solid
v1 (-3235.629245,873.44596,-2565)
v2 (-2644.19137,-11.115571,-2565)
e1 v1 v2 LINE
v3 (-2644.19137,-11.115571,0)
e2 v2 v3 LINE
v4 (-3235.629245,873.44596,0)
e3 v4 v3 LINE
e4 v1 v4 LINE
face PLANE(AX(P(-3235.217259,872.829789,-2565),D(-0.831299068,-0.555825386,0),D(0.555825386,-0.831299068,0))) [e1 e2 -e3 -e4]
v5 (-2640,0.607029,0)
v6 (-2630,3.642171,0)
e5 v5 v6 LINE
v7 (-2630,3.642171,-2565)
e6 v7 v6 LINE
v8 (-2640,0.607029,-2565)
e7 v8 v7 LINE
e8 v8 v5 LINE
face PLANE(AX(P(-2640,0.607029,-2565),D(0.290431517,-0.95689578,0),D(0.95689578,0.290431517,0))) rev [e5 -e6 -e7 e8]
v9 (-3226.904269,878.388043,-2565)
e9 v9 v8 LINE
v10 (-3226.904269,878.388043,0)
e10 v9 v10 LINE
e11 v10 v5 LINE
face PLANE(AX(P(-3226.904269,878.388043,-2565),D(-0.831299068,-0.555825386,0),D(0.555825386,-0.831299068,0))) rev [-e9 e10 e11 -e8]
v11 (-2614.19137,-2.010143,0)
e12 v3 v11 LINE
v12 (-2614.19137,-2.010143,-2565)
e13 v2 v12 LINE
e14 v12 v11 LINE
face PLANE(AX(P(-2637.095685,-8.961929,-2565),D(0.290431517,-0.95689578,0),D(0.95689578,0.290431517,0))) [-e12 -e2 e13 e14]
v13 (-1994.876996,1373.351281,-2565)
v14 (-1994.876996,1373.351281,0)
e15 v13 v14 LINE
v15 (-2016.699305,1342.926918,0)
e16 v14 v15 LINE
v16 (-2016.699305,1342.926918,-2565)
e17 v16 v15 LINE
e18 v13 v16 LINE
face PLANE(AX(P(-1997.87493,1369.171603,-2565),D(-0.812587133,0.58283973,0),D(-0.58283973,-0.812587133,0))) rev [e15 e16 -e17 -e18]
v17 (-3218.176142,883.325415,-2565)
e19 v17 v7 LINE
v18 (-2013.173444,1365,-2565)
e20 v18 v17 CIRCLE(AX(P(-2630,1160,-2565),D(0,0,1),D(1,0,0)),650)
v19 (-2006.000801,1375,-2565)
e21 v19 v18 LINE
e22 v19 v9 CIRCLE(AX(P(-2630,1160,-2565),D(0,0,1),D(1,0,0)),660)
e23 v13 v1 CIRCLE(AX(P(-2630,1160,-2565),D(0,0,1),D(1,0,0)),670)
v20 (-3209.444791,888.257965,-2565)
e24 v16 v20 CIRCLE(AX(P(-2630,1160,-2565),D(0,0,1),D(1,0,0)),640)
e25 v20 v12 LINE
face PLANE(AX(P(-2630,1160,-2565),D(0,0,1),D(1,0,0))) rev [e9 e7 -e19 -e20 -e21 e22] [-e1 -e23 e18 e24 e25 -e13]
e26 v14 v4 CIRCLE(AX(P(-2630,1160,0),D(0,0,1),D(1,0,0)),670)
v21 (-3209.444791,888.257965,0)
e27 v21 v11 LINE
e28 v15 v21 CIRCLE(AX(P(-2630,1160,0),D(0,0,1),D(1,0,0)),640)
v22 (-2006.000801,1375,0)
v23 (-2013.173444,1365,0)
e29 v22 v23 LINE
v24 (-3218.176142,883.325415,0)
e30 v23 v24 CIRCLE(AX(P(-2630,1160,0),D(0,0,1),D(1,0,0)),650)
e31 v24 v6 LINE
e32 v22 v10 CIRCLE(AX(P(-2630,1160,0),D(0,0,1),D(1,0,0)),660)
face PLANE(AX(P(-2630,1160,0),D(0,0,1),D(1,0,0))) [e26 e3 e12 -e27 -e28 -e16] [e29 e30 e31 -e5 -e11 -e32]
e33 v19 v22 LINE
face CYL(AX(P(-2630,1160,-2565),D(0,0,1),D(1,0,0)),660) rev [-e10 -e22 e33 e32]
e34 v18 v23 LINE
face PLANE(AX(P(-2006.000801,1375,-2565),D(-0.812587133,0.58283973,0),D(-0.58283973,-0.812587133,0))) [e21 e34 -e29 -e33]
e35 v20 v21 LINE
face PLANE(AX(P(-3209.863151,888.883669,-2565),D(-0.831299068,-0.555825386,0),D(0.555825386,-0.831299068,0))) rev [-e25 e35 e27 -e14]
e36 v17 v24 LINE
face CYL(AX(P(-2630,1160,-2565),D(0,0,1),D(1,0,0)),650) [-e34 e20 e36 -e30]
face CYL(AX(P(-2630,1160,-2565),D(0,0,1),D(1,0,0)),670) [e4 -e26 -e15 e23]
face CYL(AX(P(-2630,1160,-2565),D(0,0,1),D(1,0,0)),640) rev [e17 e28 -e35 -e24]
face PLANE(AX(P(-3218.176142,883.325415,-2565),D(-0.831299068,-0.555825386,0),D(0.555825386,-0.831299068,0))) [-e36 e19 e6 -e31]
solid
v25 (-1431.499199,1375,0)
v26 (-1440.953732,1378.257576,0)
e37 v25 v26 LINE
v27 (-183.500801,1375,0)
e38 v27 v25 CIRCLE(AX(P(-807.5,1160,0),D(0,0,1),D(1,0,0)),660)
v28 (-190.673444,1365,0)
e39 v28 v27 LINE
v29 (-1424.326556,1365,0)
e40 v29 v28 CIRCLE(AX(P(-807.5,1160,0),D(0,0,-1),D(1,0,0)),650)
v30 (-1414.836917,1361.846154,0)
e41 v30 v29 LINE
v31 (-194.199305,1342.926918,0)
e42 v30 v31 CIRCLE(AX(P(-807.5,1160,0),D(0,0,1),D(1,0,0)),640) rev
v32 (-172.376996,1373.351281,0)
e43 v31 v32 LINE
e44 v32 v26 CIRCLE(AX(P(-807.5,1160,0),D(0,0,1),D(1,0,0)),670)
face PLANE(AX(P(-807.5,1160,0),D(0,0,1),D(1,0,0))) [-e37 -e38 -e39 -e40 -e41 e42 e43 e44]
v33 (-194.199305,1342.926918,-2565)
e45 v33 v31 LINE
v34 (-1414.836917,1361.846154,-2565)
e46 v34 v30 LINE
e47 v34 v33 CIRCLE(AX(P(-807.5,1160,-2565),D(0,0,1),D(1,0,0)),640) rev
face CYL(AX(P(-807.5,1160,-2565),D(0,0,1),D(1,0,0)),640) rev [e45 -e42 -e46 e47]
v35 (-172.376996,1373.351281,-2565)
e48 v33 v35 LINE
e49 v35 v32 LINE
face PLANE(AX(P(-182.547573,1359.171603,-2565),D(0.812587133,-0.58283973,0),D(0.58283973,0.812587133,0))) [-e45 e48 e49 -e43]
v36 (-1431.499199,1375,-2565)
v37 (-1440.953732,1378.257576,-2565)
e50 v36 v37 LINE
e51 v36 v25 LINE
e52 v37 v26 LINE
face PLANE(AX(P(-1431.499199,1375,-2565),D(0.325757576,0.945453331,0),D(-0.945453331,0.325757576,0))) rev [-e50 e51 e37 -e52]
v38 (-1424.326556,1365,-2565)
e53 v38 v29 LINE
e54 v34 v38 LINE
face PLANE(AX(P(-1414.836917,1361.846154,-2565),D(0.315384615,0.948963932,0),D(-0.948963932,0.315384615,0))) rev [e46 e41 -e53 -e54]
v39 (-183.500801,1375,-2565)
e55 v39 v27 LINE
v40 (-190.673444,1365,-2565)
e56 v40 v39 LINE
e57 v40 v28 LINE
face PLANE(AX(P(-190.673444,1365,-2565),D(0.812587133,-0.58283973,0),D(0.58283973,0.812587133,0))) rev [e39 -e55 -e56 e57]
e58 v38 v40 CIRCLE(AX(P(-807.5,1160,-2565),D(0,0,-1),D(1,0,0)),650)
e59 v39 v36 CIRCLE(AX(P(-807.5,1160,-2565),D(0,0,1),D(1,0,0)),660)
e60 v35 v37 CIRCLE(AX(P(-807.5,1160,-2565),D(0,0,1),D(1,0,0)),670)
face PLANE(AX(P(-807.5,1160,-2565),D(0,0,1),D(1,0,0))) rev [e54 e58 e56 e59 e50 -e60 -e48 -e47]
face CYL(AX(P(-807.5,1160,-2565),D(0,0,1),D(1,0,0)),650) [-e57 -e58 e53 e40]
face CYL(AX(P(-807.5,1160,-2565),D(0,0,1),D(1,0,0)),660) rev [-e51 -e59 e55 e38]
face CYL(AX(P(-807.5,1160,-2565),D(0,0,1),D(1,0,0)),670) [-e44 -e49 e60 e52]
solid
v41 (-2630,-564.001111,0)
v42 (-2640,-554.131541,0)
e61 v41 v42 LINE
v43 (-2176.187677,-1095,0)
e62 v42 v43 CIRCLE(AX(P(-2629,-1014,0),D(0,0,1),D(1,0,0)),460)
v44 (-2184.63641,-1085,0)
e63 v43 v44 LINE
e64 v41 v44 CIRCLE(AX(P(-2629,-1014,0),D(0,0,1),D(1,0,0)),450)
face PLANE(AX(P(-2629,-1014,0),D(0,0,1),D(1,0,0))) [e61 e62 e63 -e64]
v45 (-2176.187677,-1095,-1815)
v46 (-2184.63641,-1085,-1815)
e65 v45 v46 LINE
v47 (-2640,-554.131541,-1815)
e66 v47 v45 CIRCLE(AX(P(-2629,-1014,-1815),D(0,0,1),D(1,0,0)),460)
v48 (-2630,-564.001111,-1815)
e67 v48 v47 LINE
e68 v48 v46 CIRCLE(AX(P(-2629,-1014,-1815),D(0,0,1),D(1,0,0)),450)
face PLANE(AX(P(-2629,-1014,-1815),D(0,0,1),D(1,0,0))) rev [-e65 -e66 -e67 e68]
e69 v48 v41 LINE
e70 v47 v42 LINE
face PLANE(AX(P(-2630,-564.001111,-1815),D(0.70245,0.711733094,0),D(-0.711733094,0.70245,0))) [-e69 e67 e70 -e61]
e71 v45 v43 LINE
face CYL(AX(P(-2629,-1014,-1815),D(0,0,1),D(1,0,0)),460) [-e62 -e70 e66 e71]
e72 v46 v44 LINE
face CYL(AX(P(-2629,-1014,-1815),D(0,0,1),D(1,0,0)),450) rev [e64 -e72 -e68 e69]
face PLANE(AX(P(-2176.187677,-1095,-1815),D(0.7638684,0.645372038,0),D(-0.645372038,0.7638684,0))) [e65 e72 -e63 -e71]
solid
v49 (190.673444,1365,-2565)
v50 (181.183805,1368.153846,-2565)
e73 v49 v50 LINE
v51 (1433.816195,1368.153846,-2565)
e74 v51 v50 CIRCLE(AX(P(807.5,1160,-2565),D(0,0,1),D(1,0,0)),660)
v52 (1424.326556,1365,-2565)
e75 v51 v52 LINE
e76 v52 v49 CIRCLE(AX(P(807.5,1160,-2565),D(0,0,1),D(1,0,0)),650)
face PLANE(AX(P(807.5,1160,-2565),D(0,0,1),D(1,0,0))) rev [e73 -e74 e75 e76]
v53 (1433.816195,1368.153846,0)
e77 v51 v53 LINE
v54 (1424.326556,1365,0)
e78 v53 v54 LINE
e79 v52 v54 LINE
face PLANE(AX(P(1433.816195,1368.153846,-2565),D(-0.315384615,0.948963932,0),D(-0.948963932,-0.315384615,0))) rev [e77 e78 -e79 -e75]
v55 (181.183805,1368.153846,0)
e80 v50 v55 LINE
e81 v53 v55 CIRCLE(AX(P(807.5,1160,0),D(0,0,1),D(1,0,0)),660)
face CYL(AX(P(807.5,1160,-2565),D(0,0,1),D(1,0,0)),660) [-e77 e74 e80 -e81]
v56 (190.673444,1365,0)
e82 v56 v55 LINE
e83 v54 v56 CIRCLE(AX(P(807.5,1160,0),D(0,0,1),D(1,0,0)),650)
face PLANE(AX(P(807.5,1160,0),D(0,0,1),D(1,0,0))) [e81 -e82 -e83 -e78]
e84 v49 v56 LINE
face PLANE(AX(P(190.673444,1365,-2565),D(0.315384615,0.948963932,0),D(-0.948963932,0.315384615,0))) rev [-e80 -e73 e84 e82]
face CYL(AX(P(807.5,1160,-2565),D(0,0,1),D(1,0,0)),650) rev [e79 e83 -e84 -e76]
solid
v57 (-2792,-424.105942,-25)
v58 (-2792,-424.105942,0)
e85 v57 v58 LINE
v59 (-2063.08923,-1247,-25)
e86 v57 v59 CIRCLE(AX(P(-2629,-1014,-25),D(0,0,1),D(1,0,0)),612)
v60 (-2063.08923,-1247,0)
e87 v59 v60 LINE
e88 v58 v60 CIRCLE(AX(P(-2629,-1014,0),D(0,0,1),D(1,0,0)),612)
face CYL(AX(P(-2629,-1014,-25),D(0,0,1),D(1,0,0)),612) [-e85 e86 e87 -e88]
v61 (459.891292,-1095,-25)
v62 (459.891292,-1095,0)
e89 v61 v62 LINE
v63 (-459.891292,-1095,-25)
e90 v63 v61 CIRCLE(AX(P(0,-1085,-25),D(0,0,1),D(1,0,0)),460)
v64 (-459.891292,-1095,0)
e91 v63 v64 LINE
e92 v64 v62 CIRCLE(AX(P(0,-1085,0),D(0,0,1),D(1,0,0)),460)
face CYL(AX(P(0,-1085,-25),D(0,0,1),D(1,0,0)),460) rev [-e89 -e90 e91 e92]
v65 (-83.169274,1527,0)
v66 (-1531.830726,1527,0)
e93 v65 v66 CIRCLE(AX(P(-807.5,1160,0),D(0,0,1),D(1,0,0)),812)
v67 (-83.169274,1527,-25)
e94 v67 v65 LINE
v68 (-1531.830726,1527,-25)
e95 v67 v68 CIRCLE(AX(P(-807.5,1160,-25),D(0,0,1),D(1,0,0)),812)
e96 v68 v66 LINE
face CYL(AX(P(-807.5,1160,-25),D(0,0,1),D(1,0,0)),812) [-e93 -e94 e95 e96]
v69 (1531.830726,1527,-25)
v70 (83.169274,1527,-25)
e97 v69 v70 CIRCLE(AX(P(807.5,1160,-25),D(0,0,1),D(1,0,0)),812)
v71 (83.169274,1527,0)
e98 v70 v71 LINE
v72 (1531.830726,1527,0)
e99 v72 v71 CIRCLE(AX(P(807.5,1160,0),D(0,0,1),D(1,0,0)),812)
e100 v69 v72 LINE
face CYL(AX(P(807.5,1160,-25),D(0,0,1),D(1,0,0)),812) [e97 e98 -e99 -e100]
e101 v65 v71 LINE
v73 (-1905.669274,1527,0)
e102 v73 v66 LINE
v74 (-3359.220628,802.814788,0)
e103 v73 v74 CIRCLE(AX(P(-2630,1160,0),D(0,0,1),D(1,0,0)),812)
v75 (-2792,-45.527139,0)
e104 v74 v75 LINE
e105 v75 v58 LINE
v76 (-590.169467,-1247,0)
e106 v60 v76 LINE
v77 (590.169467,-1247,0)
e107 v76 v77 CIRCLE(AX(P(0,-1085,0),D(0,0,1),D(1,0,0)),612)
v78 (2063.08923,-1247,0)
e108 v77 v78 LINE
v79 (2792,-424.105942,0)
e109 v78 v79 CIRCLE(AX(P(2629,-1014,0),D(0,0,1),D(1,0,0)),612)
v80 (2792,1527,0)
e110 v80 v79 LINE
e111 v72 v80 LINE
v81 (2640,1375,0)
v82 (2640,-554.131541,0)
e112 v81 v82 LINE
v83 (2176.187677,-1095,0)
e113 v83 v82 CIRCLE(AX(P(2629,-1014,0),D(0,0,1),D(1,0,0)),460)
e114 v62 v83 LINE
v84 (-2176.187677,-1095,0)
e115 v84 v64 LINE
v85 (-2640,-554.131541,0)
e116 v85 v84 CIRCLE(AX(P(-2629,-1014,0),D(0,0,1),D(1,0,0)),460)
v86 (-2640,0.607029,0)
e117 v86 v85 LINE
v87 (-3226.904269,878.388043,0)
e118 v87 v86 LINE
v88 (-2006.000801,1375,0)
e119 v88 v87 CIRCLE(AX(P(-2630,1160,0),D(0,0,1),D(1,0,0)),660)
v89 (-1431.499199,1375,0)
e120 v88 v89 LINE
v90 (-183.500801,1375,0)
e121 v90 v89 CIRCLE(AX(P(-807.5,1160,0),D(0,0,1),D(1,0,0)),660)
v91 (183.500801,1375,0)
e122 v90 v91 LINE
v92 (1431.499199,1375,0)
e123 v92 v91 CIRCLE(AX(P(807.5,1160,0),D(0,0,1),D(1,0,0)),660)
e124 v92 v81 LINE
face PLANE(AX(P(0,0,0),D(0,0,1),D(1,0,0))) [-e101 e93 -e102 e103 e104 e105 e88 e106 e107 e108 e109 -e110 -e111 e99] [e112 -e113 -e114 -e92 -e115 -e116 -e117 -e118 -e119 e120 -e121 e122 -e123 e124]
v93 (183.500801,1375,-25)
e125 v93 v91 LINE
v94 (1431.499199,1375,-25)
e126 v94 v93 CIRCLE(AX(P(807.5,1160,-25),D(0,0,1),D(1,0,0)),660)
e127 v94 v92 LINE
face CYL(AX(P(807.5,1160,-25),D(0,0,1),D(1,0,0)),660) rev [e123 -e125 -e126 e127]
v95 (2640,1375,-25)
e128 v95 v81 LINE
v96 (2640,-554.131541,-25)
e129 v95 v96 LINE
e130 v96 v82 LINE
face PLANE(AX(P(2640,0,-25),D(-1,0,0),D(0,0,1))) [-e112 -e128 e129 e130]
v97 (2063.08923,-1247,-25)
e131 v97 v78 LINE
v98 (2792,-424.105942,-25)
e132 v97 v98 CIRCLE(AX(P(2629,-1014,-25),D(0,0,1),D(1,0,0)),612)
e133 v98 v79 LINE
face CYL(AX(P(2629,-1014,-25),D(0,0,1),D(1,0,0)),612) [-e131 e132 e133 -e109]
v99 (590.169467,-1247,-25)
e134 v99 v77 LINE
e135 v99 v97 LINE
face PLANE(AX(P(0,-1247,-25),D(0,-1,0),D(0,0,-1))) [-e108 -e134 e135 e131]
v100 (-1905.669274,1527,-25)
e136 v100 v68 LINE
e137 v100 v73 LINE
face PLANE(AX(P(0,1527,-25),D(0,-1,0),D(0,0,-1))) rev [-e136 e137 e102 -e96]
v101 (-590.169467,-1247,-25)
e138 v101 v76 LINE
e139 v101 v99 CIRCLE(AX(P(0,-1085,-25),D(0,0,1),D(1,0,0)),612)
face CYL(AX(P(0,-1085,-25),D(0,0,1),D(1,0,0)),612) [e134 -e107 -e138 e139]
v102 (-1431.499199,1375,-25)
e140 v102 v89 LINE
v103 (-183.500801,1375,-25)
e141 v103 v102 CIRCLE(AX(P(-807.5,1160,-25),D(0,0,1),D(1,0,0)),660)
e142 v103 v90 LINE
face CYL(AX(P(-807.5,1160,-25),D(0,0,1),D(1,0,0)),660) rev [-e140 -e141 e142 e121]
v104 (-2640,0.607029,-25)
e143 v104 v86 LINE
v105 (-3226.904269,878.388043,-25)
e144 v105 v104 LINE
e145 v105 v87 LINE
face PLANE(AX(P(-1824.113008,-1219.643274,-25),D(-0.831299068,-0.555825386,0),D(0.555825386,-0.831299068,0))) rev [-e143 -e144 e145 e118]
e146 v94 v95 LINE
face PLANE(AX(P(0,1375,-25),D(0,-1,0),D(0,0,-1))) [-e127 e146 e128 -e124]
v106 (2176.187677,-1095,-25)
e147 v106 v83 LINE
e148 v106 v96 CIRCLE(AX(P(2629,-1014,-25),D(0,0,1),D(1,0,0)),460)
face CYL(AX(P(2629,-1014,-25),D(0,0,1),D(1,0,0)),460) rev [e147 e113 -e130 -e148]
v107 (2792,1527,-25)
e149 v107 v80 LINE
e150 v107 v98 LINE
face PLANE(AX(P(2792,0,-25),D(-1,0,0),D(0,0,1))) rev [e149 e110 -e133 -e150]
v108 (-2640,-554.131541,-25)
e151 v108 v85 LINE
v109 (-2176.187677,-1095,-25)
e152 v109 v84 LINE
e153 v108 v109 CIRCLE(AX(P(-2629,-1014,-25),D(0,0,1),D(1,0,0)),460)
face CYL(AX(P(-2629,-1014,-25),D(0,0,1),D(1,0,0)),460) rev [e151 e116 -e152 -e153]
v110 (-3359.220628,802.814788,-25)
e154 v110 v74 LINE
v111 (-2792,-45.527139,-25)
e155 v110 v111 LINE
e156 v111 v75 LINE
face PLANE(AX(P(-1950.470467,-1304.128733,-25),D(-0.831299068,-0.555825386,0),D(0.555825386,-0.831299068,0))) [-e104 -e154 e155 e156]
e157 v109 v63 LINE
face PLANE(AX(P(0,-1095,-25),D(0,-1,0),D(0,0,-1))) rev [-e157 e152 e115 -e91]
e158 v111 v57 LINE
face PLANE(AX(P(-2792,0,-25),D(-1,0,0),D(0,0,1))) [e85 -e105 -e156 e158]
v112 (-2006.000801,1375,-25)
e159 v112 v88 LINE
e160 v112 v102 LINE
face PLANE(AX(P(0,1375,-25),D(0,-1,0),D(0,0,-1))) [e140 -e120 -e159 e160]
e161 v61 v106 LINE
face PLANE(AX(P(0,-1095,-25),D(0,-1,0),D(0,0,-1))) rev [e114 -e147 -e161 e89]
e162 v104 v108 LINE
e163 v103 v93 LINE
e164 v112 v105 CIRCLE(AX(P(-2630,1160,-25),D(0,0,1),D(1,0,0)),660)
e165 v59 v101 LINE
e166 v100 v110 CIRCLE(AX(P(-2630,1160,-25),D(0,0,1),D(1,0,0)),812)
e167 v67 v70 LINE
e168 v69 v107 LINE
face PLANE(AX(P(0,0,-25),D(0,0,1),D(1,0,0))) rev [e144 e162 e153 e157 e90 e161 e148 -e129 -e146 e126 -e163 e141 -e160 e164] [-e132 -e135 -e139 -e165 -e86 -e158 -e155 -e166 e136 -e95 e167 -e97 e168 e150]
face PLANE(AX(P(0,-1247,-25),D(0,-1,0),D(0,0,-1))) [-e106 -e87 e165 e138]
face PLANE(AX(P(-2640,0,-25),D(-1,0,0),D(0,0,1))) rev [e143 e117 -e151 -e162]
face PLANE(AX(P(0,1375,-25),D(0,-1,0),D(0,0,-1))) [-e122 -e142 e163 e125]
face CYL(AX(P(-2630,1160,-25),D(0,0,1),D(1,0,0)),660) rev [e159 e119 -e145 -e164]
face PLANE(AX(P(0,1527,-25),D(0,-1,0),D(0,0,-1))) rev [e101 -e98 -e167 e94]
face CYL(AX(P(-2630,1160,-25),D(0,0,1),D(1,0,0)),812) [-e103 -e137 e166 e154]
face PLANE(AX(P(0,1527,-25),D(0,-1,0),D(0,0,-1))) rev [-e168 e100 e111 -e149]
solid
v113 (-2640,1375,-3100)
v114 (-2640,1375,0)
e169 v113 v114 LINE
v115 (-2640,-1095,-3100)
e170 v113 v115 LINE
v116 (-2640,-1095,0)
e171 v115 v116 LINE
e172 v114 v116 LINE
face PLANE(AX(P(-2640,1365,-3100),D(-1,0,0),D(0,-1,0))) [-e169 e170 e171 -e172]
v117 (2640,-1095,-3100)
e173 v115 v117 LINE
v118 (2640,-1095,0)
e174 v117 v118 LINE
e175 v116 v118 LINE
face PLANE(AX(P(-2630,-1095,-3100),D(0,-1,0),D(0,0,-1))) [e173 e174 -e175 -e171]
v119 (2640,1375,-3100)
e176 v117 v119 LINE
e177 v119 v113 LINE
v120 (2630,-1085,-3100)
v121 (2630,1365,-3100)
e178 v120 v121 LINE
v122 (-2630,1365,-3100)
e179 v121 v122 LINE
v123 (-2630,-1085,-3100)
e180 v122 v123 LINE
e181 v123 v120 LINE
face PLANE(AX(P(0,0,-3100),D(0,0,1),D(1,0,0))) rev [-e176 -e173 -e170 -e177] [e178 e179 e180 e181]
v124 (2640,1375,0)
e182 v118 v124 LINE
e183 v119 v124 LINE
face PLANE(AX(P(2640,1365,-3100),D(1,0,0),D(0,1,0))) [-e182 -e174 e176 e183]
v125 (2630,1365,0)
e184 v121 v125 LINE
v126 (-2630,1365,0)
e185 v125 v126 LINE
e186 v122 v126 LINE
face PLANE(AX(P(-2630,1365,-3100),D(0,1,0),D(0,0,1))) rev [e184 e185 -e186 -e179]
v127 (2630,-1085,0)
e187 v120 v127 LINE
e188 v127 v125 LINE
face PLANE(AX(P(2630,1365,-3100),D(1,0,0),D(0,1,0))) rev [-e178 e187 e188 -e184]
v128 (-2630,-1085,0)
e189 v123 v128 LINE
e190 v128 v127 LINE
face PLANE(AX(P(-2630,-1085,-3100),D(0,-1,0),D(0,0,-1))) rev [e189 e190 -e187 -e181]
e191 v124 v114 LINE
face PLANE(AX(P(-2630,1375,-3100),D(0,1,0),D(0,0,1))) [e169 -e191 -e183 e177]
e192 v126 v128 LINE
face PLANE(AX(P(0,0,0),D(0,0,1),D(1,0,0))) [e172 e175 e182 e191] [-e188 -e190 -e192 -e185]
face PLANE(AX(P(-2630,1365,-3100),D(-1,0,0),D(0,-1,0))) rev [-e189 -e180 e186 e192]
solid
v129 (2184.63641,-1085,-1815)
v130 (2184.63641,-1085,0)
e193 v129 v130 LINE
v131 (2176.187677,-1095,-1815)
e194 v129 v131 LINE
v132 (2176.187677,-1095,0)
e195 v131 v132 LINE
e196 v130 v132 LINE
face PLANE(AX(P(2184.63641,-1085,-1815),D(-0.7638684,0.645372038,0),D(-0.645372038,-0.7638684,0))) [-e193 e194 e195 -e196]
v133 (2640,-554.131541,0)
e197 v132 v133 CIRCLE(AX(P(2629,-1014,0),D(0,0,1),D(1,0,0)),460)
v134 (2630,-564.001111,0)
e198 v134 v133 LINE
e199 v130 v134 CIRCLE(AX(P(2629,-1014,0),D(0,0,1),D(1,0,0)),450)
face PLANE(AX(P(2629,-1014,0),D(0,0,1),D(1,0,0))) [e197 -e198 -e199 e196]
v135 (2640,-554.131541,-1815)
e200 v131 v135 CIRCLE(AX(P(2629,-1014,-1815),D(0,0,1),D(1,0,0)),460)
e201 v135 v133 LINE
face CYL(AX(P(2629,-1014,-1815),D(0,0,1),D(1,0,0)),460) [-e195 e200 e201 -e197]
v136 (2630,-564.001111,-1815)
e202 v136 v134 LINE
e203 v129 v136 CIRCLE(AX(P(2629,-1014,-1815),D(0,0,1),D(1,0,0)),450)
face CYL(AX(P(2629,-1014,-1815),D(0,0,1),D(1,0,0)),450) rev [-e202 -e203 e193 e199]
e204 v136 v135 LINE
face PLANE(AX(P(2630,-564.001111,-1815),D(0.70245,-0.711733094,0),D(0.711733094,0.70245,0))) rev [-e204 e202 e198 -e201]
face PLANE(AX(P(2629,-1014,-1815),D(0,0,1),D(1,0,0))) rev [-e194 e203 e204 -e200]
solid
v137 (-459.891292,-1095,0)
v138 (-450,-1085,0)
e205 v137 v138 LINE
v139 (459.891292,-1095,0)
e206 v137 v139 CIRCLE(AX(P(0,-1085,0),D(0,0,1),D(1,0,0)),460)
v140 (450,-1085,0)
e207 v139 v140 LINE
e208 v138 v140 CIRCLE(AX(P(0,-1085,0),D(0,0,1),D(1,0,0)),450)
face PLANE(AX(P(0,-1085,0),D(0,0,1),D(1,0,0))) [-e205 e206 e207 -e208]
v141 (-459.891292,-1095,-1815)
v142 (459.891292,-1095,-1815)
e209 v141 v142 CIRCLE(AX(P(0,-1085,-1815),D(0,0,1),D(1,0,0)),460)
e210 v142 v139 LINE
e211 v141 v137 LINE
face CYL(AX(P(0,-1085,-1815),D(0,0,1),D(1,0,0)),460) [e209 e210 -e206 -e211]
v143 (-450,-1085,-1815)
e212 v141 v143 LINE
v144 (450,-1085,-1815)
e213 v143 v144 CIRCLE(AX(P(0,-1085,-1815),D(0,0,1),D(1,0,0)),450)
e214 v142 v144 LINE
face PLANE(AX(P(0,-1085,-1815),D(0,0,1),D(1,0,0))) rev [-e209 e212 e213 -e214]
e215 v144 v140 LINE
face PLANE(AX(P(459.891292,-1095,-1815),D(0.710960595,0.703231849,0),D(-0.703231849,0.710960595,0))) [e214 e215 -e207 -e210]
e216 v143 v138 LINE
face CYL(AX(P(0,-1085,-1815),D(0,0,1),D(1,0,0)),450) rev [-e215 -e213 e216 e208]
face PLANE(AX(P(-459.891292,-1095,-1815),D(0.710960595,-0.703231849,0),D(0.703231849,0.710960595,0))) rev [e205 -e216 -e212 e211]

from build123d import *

# Parameters (mm, degrees)
BOSS_EXTRUDE2_DEPTH         = 25
SKETCH13_W                  = 5280
SKETCH13_H                  = 2470
SKETCH13_W_2                = 5260
SKETCH13_H_2                = 2450
EXTRUDE_THIN3_DEPTH         = 3100
OLTC_ROUND_EXTRUDE5_DEPTH   = 1815
OLTC_ROUND_EXTRUDE5_2_DEPTH = 1815
OLTC_ROUND_EXTRUDE5_3_DEPTH = 1815
EXTRUDE_THIN6_DEPTH         = 2565
EXTRUDE_THIN6_2_DEPTH       = 2565
EXTRUDE_THIN6_3_DEPTH       = 2565


with BuildPart() as part:
    # curb → Boss-Extrude2 (new body)
    with BuildSketch(Plane.XY):
        with BuildLine():
            ThreePointArc((-1905.669274433, 1527), (-2992.100860231, 1886.792244744), (-3359.22062819, 802.81478835))
            Line((-3359.22062819, 802.81478835), (-2792, -45.527139379))
            Line((-2792, -45.527139379), (-2792, -424.105941715))
            ThreePointArc((-2792, -424.105941715), (-3087.118903787, -1419.796833395), (-2063.089229648, -1247))
            Line((-2063.089229648, -1247), (-590.169467187, -1247))
            ThreePointArc((-590.169467187, -1247), (0, -1697), (590.169467187, -1247))
            Line((590.169467187, -1247), (2063.089229648, -1247))
            ThreePointArc((2063.089229648, -1247), (3087.118903787, -1419.796833395), (2792, -424.105941715))
            Line((2792, -424.105941715), (2792, 1527))
            Line((2792, 1527), (1531.830725567, 1527))
            ThreePointArc((1531.830725567, 1527), (807.5, 1972), (83.169274433, 1527))
            Line((83.169274433, 1527), (-83.169274433, 1527))
            ThreePointArc((-83.169274433, 1527), (-807.5, 1972), (-1531.830725567, 1527))
            Line((-1531.830725567, 1527), (-1905.669274433, 1527))
        make_face()
        with BuildLine():
            Line((-2640, -554.131540547), (-2640, 0.607028525))
            Line((-2640, 0.607028525), (-3226.904268523, 878.38804319))
            ThreePointArc((-3226.904268523, 878.38804319), (-2878.675275655, 1771.359638247), (-2006.000801283, 1375))
            Line((-2006.000801283, 1375), (-1431.499198717, 1375))
            ThreePointArc((-1431.499198717, 1375), (-807.5, 1820), (-183.500801283, 1375))
            Line((-183.500801283, 1375), (183.500801283, 1375))
            ThreePointArc((183.500801283, 1375), (807.5, 1820), (1431.499198717, 1375))
            Line((1431.499198717, 1375), (2640, 1375))
            Line((2640, 1375), (2640, -554.131540547))
            ThreePointArc((2640, -554.131540547), (2978.190785718, -1313.44247389), (2176.187676846, -1095))
            Line((2176.187676846, -1095), (459.891291503, -1095))
            ThreePointArc((459.891291503, -1095), (0, -1545), (-459.891291503, -1095))
            Line((-459.891291503, -1095), (-2176.187676846, -1095))
            ThreePointArc((-2176.187676846, -1095), (-2978.190785718, -1313.44247389), (-2640, -554.131540547))
        make_face(mode=Mode.SUBTRACT)
    extrude(amount=-BOSS_EXTRUDE2_DEPTH)


with BuildPart() as body_2:
    # Sketch13 → Extrude-Thin3 (new body)
    with BuildSketch(Plane.XY):
        with Locations((0, 140)):
            Rectangle(SKETCH13_W, SKETCH13_H)
        with Locations((0, 140)):
            Rectangle(SKETCH13_W_2, SKETCH13_H_2, mode=Mode.SUBTRACT)
    extrude(amount=-EXTRUDE_THIN3_DEPTH)


with BuildPart() as body_3:
    # hv round → oltc round-Extrude5 (new body)
    with BuildSketch(Plane.XY):
        with BuildLine():
            Line((2184.636410132, -1085), (2176.187676846, -1095))
            ThreePointArc((2176.187676846, -1095), (2978.190785718, -1313.44247389), (2640, -554.131540547))
            Line((2640, -554.131540547), (2630, -564.001111112))
            ThreePointArc((2630, -564.001111112), (2971.056689396, -1306.399078725), (2184.636410132, -1085))
        make_face()
    extrude(amount=-OLTC_ROUND_EXTRUDE5_DEPTH)


with BuildPart() as body_4:
    # hv round → oltc round-Extrude5 2 (new body)
    with BuildSketch(Plane.XY):
        with BuildLine():
            Line((459.891291503, -1095), (450, -1085))
            ThreePointArc((450, -1085), (0, -1535), (-450, -1085))
            Line((-450, -1085), (-459.891291503, -1095))
            ThreePointArc((-459.891291503, -1095), (0, -1545), (459.891291503, -1095))
        make_face()
    extrude(amount=-OLTC_ROUND_EXTRUDE5_2_DEPTH)


with BuildPart() as body_5:
    # hv round → oltc round-Extrude5 3 (new body)
    with BuildSketch(Plane.XY):
        with BuildLine():
            Line((-2176.187676846, -1095), (-2184.636410132, -1085))
            ThreePointArc((-2184.636410132, -1085), (-2971.056689396, -1306.399078725), (-2630, -564.001111112))
            Line((-2630, -564.001111112), (-2640, -554.131540547))
            ThreePointArc((-2640, -554.131540547), (-2978.190785718, -1313.44247389), (-2176.187676846, -1095))
        make_face()
    extrude(amount=-OLTC_ROUND_EXTRUDE5_3_DEPTH)


with BuildPart() as body_6:
    # oltc round → Extrude-Thin6 (new body)
    with BuildSketch(Plane.XY):
        with BuildLine():
            Line((-1994.876995624, 1373.351281489), (-2016.699304896, 1342.926918153))
            ThreePointArc((-2016.699304896, 1342.926918153), (-2857.963856524, 1758.023812334), (-3209.444791338, 888.257964622))
            Line((-3209.444791338, 888.257964622), (-2614.19136966, -2.010142948))
            Line((-2614.19136966, -2.010142948), (-2644.19136966, -11.115570824))
            Line((-2644.19136966, -11.115570824), (-3235.62924464, 873.445959658))
            ThreePointArc((-3235.62924464, 873.445959658), (-2880.387306316, 1781.4549033), (-1994.876995624, 1373.351281489))
        make_face()
        with BuildLine():
            Line((-2006.000801283, 1375), (-2013.173444151, 1365))
            ThreePointArc((-2013.173444151, 1365), (-2871.262954199, 1763.566224147), (-3218.17614189, 883.325414771))
            Line((-3218.17614189, 883.325414771), (-2630, 3.64217115))
            Line((-2630, 3.64217115), (-2640, 0.607028525))
            Line((-2640, 0.607028525), (-3226.904268523, 878.38804319))
            ThreePointArc((-3226.904268523, 878.38804319), (-2878.675275655, 1771.359638247), (-2006.000801283, 1375))
        make_face(mode=Mode.SUBTRACT)
    extrude(amount=-EXTRUDE_THIN6_DEPTH)


with BuildPart() as body_7:
    # oltc round → Extrude-Thin6 2 (new body)
    with BuildSketch(Plane.XY):
        with BuildLine():
            ThreePointArc((-1424.326555849, 1365), (-807.5, 1810), (-190.673444151, 1365))
            Line((-190.673444151, 1365), (-183.500801283, 1375))
            ThreePointArc((-183.500801283, 1375), (-807.5, 1820), (-1431.499198717, 1375))
            Line((-1431.499198717, 1375), (-1440.953732031, 1378.257575758))
            ThreePointArc((-1440.953732031, 1378.257575758), (-804.908755433, 1829.994989124), (-172.376995624, 1373.351281489))
            Line((-172.376995624, 1373.351281489), (-194.199304896, 1342.926918153))
            ThreePointArc((-194.199304896, 1342.926918153), (-797.581530686, 1799.923139108), (-1414.836916528, 1361.846153846))
            Line((-1414.836916528, 1361.846153846), (-1424.326555849, 1365))
        make_face()
    extrude(amount=-EXTRUDE_THIN6_2_DEPTH)


with BuildPart() as body_8:
    # oltc round → Extrude-Thin6 3 (new body)
    with BuildSketch(Plane.XY):
        with BuildLine():
            ThreePointArc((1424.326555849, 1365), (807.5, 1810), (190.673444151, 1365))
            Line((190.673444151, 1365), (181.183804831, 1368.153846154))
            ThreePointArc((181.183804831, 1368.153846154), (807.5, 1820), (1433.816195169, 1368.153846154))
            Line((1433.816195169, 1368.153846154), (1424.326555849, 1365))
        make_face()
    extrude(amount=-EXTRUDE_THIN6_3_DEPTH)


solid = Compound([part.part, body_2.part, body_3.part, body_4.part, body_5.part, body_6.part, body_7.part, body_8.part])
